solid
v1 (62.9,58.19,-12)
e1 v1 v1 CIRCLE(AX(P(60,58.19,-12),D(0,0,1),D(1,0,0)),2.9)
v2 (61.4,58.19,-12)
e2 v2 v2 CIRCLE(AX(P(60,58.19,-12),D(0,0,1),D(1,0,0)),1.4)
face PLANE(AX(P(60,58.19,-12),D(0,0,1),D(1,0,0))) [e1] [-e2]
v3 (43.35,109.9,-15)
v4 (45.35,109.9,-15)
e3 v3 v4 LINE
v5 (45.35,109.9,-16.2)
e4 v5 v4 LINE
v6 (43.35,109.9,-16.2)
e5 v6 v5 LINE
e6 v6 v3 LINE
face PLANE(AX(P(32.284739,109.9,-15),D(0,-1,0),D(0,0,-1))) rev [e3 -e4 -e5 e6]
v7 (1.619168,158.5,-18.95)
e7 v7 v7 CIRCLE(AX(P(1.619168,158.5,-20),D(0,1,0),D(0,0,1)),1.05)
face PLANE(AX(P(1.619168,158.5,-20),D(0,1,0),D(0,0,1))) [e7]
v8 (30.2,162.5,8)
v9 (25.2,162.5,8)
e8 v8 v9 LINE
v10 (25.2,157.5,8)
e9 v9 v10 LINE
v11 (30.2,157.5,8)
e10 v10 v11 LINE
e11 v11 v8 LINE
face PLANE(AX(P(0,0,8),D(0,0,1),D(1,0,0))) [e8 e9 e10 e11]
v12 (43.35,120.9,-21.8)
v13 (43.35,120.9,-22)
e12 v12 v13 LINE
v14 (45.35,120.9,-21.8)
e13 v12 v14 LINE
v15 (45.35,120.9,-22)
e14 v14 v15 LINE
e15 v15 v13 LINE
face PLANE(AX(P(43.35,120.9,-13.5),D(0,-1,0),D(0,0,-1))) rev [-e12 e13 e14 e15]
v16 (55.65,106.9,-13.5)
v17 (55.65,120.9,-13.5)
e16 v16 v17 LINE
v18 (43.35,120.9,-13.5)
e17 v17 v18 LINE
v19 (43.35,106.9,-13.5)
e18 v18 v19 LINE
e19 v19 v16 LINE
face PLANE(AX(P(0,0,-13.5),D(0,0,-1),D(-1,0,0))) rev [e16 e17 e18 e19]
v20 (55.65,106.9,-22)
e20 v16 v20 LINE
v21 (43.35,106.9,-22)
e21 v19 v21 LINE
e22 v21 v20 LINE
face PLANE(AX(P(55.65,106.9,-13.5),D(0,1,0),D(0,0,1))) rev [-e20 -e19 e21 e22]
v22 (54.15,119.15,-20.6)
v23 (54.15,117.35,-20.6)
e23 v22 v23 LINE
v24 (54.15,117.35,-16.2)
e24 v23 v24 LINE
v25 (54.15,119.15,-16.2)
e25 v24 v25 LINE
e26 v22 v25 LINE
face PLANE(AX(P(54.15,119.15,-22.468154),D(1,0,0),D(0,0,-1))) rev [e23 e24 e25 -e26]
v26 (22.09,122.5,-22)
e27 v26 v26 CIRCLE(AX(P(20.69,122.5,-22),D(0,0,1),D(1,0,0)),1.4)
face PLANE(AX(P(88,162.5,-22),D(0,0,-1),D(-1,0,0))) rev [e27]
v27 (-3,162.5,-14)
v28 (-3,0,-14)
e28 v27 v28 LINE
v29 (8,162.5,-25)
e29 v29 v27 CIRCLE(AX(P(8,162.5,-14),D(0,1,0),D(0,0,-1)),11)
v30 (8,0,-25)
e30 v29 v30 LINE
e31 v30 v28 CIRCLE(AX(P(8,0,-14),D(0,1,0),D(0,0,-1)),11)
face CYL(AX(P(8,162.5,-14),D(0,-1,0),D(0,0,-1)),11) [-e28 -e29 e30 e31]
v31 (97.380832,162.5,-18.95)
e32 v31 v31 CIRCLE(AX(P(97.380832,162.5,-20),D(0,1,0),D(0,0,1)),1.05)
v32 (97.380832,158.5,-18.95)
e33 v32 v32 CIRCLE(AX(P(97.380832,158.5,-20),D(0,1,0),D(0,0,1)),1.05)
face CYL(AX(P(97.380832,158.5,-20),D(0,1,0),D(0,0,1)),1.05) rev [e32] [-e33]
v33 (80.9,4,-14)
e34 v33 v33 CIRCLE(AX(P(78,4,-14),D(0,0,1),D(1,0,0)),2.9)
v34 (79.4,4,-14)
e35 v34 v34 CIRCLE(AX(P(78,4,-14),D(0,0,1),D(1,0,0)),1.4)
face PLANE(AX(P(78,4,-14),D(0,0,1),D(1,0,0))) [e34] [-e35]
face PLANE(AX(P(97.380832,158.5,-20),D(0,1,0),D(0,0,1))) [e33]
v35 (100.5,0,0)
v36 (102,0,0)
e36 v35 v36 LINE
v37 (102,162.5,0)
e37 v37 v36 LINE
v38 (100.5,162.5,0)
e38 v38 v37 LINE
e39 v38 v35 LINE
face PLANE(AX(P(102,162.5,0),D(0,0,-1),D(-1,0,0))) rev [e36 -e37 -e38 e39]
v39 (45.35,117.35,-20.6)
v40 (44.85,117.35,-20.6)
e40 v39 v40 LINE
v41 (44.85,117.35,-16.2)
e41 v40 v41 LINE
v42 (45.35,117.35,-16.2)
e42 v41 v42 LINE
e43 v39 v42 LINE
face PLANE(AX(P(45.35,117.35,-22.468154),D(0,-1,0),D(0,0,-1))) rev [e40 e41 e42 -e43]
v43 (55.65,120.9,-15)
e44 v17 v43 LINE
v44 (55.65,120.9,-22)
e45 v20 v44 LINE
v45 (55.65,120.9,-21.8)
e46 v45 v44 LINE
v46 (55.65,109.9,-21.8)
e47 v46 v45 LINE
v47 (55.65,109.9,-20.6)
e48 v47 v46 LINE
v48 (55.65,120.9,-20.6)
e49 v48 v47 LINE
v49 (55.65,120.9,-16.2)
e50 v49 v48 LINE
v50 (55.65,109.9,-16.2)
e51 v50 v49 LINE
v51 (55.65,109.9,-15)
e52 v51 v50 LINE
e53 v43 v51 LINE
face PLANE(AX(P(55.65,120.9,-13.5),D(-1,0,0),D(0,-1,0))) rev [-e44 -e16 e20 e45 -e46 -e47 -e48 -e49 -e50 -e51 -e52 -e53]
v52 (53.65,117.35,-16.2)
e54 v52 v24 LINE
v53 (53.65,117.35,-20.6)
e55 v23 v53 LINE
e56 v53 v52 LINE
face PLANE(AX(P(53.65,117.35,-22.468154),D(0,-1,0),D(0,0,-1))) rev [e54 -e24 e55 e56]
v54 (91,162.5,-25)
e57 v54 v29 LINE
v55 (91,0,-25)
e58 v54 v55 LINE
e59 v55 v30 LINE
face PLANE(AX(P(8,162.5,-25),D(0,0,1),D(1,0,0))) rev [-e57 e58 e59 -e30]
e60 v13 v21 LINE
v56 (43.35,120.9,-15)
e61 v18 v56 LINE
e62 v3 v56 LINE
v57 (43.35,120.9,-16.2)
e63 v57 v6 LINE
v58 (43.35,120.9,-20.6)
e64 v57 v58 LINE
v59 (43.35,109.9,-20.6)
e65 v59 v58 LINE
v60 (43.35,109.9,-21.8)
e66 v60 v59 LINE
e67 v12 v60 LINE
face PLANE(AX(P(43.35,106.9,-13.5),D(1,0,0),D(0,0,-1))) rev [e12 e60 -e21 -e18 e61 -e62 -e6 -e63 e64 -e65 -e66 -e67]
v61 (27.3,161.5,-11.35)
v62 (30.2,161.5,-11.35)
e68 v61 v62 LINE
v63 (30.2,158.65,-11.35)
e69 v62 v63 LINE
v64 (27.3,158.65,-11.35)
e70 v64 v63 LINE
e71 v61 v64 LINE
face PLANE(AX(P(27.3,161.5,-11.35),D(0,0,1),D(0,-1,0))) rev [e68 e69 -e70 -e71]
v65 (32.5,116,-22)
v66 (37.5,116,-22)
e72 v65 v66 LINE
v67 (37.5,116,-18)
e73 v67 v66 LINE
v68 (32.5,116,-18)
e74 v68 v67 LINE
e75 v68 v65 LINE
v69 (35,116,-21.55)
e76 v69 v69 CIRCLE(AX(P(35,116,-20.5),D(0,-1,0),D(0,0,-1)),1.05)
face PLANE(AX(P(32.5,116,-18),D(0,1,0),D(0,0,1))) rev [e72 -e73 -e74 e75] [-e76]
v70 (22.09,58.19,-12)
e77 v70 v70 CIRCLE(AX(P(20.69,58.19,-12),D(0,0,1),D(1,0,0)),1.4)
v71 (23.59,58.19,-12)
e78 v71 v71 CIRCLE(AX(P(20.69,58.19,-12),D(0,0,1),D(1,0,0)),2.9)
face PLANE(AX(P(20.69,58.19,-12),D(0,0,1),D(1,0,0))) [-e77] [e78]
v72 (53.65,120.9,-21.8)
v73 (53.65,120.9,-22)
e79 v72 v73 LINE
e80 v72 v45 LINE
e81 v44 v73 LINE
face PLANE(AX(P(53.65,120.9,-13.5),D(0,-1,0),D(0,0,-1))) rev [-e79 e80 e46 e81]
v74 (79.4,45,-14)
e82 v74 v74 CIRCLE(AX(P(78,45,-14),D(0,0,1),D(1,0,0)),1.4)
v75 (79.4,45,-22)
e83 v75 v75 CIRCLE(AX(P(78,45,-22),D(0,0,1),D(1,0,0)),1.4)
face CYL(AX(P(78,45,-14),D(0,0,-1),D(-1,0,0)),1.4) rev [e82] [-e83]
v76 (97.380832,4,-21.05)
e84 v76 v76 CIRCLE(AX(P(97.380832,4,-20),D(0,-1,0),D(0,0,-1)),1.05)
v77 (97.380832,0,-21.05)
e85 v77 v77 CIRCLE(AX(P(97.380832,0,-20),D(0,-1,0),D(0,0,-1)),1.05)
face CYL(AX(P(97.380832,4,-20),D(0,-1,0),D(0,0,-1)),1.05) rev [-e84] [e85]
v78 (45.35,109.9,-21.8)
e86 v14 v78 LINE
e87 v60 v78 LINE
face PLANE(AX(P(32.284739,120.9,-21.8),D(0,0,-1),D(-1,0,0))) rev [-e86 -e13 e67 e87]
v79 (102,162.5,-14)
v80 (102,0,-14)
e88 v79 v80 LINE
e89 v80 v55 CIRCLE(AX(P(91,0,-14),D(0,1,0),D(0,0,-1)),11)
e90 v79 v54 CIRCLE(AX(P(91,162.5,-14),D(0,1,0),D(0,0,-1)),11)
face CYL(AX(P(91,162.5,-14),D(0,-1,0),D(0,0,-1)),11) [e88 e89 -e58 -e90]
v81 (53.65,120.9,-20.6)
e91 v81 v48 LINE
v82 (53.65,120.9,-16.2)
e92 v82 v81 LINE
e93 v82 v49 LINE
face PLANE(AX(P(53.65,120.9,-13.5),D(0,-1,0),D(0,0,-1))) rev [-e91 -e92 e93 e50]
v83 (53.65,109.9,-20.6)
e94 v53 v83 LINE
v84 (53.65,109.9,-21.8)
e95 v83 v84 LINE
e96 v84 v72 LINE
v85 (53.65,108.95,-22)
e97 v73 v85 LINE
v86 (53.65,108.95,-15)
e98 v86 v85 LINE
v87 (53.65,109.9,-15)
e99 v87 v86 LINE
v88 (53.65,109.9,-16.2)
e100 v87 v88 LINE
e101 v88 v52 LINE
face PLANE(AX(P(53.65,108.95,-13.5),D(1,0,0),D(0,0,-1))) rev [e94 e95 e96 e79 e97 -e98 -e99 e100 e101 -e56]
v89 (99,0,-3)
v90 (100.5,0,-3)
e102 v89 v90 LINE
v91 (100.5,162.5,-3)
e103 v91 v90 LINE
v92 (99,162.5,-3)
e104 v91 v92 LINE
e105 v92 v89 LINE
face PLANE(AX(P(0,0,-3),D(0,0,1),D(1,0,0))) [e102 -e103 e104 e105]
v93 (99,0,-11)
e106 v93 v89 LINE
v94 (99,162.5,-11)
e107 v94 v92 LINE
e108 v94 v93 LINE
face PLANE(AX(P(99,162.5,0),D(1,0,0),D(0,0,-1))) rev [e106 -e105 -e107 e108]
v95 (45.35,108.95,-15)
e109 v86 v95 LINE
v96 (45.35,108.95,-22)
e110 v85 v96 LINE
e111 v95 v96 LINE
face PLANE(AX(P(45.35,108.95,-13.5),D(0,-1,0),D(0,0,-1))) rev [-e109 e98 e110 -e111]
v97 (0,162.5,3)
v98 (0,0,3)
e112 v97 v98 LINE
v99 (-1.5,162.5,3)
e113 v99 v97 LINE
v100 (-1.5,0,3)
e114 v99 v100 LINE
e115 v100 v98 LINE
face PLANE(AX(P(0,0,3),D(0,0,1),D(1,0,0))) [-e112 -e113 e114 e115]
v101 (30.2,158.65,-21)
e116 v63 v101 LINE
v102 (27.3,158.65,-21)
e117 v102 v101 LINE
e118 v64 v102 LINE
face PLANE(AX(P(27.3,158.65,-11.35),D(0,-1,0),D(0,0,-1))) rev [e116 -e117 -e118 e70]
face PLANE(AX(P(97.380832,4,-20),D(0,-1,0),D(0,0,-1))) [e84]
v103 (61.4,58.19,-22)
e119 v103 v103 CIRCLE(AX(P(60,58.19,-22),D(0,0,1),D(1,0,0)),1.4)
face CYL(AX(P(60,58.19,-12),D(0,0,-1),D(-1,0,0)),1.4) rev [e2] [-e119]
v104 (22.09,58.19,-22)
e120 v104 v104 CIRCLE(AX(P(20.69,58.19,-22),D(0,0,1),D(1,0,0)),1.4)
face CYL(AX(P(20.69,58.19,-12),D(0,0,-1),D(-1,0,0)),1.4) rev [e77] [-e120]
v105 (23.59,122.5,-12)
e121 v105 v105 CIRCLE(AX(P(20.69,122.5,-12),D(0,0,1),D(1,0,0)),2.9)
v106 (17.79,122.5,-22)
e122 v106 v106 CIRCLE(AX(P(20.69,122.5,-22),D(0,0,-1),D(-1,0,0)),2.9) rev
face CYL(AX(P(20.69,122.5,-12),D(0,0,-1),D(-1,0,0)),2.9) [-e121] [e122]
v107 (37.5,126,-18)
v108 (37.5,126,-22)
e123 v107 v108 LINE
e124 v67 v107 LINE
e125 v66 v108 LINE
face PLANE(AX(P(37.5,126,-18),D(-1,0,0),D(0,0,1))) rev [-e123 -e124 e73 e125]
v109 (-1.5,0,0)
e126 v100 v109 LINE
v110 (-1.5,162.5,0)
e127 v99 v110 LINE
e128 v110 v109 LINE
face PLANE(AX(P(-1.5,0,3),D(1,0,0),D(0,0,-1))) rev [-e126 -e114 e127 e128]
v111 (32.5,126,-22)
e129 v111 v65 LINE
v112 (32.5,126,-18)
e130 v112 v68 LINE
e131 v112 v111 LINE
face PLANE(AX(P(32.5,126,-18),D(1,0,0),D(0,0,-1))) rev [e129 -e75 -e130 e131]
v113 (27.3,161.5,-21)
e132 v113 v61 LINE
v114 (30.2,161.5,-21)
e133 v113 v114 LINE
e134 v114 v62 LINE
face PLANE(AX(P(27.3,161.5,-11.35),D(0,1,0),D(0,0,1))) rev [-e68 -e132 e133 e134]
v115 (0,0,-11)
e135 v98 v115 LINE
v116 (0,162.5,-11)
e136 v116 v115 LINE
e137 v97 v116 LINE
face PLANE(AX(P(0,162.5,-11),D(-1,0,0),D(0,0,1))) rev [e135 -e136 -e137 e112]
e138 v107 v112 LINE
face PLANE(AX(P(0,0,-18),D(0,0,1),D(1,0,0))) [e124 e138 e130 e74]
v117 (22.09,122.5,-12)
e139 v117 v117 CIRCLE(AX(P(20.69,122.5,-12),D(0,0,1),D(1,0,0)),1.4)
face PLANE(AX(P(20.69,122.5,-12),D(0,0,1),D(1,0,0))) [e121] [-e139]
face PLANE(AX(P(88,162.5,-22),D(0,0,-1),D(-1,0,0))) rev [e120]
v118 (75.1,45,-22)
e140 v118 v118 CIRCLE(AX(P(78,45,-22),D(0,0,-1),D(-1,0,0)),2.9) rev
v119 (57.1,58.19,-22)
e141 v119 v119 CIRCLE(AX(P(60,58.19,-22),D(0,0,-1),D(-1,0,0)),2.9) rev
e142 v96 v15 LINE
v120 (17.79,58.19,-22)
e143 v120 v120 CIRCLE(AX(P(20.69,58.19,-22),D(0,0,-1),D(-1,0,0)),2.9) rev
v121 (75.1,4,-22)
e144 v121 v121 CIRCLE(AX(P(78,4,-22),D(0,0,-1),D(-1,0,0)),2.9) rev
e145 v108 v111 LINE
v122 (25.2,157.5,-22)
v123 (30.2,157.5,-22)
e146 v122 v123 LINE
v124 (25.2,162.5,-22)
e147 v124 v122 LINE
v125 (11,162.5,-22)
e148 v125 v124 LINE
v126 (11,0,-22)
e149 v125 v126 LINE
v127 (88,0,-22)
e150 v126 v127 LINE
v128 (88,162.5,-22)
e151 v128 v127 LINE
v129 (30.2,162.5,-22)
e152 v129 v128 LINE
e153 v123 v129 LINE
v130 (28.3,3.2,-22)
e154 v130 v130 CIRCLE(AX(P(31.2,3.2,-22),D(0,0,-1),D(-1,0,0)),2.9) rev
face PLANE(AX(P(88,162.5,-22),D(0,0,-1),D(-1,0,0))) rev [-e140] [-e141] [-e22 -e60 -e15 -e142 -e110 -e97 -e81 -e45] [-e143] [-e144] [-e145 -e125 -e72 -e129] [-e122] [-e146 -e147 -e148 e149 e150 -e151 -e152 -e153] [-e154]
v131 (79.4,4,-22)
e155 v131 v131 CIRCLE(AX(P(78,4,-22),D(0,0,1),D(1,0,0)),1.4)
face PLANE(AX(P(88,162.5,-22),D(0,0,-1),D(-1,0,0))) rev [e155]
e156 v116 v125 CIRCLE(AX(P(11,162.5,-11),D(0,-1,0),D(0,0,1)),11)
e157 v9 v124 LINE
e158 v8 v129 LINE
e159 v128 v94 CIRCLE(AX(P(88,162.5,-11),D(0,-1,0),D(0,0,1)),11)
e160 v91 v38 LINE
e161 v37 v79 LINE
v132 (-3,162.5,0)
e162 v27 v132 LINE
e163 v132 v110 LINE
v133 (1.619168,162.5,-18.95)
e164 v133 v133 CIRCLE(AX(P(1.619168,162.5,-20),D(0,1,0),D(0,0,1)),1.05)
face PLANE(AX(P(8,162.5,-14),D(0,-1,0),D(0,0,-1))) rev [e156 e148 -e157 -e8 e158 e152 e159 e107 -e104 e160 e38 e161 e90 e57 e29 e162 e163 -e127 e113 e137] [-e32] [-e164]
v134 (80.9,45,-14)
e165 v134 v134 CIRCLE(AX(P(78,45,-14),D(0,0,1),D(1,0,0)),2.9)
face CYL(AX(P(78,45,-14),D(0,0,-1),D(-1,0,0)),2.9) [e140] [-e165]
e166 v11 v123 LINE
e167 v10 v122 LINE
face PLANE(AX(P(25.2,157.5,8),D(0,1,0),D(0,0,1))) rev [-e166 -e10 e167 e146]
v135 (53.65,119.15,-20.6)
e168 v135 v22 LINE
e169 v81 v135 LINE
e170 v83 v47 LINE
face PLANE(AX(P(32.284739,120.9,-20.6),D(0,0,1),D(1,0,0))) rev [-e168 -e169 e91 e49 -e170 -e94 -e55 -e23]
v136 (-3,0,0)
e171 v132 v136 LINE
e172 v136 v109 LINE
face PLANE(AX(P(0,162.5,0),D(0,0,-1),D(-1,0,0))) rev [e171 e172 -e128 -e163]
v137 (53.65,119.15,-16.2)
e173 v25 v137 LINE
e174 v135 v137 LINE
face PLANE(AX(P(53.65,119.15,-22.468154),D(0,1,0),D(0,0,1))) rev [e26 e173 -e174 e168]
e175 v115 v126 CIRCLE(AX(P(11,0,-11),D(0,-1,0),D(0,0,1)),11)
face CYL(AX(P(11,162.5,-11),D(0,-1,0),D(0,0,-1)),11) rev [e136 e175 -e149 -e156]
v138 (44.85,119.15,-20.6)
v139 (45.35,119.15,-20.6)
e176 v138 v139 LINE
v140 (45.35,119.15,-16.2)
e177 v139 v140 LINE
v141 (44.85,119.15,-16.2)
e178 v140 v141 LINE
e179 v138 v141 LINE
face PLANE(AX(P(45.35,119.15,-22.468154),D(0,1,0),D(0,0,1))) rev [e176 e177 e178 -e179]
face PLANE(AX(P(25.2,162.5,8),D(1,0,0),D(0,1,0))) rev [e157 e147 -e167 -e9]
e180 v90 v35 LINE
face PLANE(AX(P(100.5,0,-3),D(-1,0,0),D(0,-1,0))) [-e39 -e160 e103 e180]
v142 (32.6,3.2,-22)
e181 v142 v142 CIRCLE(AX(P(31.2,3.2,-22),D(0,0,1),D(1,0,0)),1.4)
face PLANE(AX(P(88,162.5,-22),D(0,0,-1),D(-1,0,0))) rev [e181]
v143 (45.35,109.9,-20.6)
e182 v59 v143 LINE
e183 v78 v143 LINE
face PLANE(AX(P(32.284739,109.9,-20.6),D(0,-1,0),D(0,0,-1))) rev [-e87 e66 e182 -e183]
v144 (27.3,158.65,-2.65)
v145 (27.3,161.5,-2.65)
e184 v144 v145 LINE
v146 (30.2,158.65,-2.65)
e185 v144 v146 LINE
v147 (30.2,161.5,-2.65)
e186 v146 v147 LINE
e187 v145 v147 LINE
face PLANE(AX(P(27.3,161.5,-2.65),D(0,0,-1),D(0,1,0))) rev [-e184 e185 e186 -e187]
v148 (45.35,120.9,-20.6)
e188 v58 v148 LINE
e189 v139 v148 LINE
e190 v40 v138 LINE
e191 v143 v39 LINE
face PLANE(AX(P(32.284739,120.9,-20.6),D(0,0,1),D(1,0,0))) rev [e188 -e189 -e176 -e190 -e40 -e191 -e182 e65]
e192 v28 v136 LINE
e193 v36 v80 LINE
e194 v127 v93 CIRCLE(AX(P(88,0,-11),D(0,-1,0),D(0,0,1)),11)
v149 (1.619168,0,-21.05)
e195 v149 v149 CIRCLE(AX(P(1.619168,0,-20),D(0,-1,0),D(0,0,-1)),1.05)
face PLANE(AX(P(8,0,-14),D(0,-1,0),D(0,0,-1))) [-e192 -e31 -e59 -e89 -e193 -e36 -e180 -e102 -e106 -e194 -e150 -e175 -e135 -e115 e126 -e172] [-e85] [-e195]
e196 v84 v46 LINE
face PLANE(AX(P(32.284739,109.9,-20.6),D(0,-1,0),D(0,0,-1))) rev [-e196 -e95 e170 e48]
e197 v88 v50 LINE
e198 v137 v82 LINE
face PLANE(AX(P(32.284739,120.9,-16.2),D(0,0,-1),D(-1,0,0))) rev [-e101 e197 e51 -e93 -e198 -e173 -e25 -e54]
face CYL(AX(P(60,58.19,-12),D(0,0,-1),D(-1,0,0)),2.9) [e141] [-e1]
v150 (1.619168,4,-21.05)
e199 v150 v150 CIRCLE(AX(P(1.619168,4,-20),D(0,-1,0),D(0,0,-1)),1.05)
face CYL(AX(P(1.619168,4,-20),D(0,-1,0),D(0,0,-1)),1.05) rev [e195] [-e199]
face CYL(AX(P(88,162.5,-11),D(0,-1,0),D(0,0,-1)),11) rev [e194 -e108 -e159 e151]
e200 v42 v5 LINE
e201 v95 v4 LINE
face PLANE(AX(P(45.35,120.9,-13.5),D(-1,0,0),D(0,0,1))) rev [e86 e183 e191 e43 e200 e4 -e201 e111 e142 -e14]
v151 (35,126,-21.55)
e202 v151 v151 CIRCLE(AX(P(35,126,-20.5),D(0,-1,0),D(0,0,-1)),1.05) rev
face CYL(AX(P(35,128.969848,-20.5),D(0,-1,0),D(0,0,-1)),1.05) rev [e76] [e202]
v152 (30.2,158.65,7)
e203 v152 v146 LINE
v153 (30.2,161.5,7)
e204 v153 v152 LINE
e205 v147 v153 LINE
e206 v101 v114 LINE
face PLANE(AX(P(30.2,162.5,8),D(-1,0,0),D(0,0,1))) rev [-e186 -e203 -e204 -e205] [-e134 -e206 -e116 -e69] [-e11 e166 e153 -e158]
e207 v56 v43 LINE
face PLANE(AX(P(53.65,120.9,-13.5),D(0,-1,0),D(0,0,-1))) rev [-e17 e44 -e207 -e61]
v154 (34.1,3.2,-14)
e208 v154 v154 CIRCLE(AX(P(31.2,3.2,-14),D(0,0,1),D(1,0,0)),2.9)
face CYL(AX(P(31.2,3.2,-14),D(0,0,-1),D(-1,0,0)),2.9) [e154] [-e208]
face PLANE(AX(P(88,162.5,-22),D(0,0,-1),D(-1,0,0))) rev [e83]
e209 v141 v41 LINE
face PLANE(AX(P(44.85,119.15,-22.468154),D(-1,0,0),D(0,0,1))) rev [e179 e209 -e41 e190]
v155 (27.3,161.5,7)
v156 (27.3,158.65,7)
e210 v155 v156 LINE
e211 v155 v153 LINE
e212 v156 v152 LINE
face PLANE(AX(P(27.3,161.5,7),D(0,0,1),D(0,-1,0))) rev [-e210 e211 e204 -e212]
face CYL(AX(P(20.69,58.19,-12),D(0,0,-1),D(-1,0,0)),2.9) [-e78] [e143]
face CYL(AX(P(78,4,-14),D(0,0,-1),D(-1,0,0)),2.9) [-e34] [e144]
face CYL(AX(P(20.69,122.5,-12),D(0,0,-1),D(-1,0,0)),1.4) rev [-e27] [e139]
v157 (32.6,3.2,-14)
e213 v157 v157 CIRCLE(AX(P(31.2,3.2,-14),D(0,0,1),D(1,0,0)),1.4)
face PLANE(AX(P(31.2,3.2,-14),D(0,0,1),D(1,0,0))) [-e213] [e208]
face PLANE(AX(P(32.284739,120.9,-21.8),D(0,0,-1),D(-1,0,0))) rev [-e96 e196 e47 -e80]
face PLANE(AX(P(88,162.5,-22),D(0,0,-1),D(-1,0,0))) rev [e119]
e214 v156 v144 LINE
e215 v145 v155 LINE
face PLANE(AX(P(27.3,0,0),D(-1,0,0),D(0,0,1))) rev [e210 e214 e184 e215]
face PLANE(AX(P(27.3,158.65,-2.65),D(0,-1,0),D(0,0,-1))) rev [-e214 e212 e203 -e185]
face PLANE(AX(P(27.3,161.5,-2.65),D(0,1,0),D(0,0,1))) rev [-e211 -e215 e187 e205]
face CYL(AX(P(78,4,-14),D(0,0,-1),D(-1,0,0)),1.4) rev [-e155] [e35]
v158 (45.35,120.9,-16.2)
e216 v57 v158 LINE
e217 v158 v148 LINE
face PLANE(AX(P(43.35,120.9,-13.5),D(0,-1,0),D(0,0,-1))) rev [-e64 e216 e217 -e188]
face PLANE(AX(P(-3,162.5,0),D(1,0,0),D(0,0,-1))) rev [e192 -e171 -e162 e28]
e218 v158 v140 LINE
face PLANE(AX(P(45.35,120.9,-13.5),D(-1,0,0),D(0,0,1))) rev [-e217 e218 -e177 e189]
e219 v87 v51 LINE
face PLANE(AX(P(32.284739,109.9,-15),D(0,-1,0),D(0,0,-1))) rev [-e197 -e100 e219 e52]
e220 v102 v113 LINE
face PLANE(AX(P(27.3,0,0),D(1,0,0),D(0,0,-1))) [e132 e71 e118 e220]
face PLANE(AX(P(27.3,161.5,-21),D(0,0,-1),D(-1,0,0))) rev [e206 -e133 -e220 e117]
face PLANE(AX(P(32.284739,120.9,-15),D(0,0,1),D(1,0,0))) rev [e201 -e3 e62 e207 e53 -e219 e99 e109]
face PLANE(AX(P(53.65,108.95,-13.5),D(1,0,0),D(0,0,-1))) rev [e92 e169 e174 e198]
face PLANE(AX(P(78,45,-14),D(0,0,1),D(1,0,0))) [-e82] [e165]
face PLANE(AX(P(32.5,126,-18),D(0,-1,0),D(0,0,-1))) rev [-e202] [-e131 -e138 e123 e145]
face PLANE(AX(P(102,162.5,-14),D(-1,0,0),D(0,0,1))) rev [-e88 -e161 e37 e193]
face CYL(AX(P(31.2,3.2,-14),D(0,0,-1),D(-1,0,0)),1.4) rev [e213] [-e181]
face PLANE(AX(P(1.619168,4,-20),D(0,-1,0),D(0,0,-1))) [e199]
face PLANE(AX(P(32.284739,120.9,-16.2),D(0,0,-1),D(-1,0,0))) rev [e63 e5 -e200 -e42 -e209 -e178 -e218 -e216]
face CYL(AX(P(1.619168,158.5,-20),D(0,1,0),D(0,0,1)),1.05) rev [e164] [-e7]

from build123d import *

# Parameters (mm, degrees)
EXTRUDE_1_DEPTH       = 162.5
SKETCH_2_W            = 1.5
SKETCH_2_H            = 162.5
EXTRUDE_2_DEPTH       = 3
SKETCH_2_4_W          = 1.5
SKETCH_2_4_H          = 162.5
CUT_EXTRUDE_2_DEPTH   = 3
SKETCH_3_R            = 1.05
CUT_EXTRUDE_3_DEPTH   = 4
CUT_EXTRUDE_START     = -4
SKETCH_4_R            = 1.05
CUT_EXTRUDE_4_DEPTH   = 4
SKETCH_6_R            = 2.9
SKETCH_6_R_2          = 1.4
EXTRUDE_1_2_DEPTH     = 10
SKETCH_7_R            = 2.9
SKETCH_7_R_2          = 1.4
EXTRUDE_2_2_DEPTH     = 8
EXTRUDE_4_DEPTH       = 8.5
CUT_EXTRUDE_6_REACH   = 176.56
SKETCH_13_W           = 1.2
SKETCH_13_H           = 11
EXTRUDE_START         = 1.4
EXTRUDE_5_OUTLINE_W   = 0.5
EXTRUDE_5_OUTLINE_H   = 1.8
EXTRUDE_5_DEPTH       = 4.4
EXTRUDE_5_2_OUTLINE_W = 5
EXTRUDE_5_2_OUTLINE_H = 10
EXTRUDE_5_2_DEPTH     = 4
EXTRUDE_START_2       = 116
EXTRUDE_6_OUTLINE_R   = 1.05
EXTRUDE_6_DEPTH       = 10
EXTRUDE_START_3       = 157.5
EXTRUDE_6_2_OUTLINE_W = 5
EXTRUDE_6_2_OUTLINE_H = 30
EXTRUDE_6_2_DEPTH     = 5
EXTRUDE_START_4       = -7.5
EXTRUDE_7_OUTLINE_W   = 2.9
EXTRUDE_7_OUTLINE_H   = 2.85
EXTRUDE_7_DEPTH       = 9.65
EXTRUDE_START_5       = 10.85
EXTRUDE_7_2_OUTLINE_W = 2.9
EXTRUDE_7_2_OUTLINE_H = 2.85
EXTRUDE_7_2_DEPTH     = 9.65
EXTRUDE_START_6       = -1.5
EXTRUDE_7_3_OUTLINE_W = 8.3
EXTRUDE_7_3_OUTLINE_H = 11.95
EXTRUDE_7_3_DEPTH     = 1.5


# Read off the part's stored shape, not the designer's step: 凸台-拉伸5, 凸台-拉伸6, 凸台-拉伸7
with BuildPart() as part:
    # 草图1 → Extrude 1 (new body)
    with BuildSketch(Plane(origin=(0, 0, 0), x_dir=(1, 0, 0), z_dir=(0, 1, 0))):
        with BuildLine():
            Line((-3, 0), (-3, 14))
            ThreePointArc((-3, 14), (0.221825407, 21.778174593), (8, 25))
            Line((8, 25), (91, 25))
            ThreePointArc((91, 25), (98.778174593, 21.778174593), (102, 14))
            Line((102, 14), (102, 0))
            Line((102, 0), (99, 0))
            Line((99, 0), (99, 11))
            ThreePointArc((99, 11), (95.778174593, 18.778174593), (88, 22))
            Line((88, 22), (11, 22))
            ThreePointArc((11, 22), (3.221825407, 18.778174593), (0, 11))
            Line((0, 11), (0, 0))
            Line((0, 0), (-3, 0))
        make_face()
    extrude(amount=EXTRUDE_1_DEPTH)

    # 草图2 → Extrude 2 (add)
    with BuildSketch(Plane.XY):
        with Locations((-0.75, 81.25)):
            Rectangle(SKETCH_2_W, SKETCH_2_H)
    extrude(amount=EXTRUDE_2_DEPTH)

    # 草图2<4> → 切除-拉伸2 (cut)
    with BuildSketch(Plane.XY):
        with Locations((99.75, 81.25)):
            Rectangle(SKETCH_2_4_W, SKETCH_2_4_H)
    extrude(amount=-CUT_EXTRUDE_2_DEPTH, mode=Mode.SUBTRACT)

    # 草图3 → 切除-拉伸3 (cut)
    with BuildSketch(Plane(origin=(0, 162.5, 0), x_dir=(1, 0, 0), z_dir=(0, 1, 0))):
        with Locations(Location((1.61916848, 20, 0), (0, 0, 270))):
            Circle(SKETCH_3_R)
        with Locations(Location((97.38083152, 20, 0), (0, 0, 270))):
            Circle(SKETCH_3_R)
    extrude(amount=-CUT_EXTRUDE_3_DEPTH, mode=Mode.SUBTRACT)

    # 草图4 → 切除-拉伸4 (cut)
    with BuildSketch(Plane.XZ.offset(CUT_EXTRUDE_START)):
        with Locations(Location((1.61916848, -20, 0), (0, 0, 90))):
            Circle(SKETCH_4_R)
        with Locations(Location((97.38083152, -20, 0), (0, 0, 90))):
            Circle(SKETCH_4_R)
    extrude(amount=CUT_EXTRUDE_4_DEPTH, mode=Mode.SUBTRACT)

    # 草图6 → Extrude 1 2 (add)
    # profile 1 of 3: a face of its own
    with BuildSketch(Plane.XY.offset(-22)):
        with Locations((20.69, 122.5)):
            Circle(SKETCH_6_R)
        with Locations((20.69, 122.5)):
            Circle(SKETCH_6_R_2, mode=Mode.SUBTRACT)
    # profile 2 of 3: a face of its own
    with BuildSketch(Plane.XY.offset(-22)):
        with Locations((20.69, 58.19)):
            Circle(SKETCH_6_R)
        with Locations((20.69, 58.19)):
            Circle(SKETCH_6_R_2, mode=Mode.SUBTRACT)
    # profile 3 of 3: a face of its own
    with BuildSketch(Plane.XY.offset(-22)):
        with Locations((60, 58.19)):
            Circle(SKETCH_6_R)
        with Locations((60, 58.19)):
            Circle(SKETCH_6_R_2, mode=Mode.SUBTRACT)
    extrude(amount=EXTRUDE_1_2_DEPTH)

    # 草图7 → Extrude 2 2 (add)
    # profile 1 of 3: a face of its own
    with BuildSketch(Plane.XY.offset(-22)):
        with Locations((78, 4)):
            Circle(SKETCH_7_R)
        with Locations((78, 4)):
            Circle(SKETCH_7_R_2, mode=Mode.SUBTRACT)
    # profile 2 of 3: a face of its own
    with BuildSketch(Plane.XY.offset(-22)):
        with Locations((31.2, 3.2)):
            Circle(SKETCH_7_R)
        with Locations((31.2, 3.2)):
            Circle(SKETCH_7_R_2, mode=Mode.SUBTRACT)
    # profile 3 of 3: a face of its own
    with BuildSketch(Plane.XY.offset(-22)):
        with Locations((78, 45)):
            Circle(SKETCH_7_R)
        with Locations((78, 45)):
            Circle(SKETCH_7_R_2, mode=Mode.SUBTRACT)
    extrude(amount=EXTRUDE_2_2_DEPTH)

    # 草图12 → 凸台-拉伸4 (add)
    with BuildSketch(Plane.XY.offset(-22)):
        Polygon((45.35, 120.9), (45.35, 108.95), (53.65, 108.95), (53.65, 120.9), (55.65, 120.9), (55.65, 106.9), (43.35, 106.9), (43.35, 120.9), align=None)
    extrude(amount=EXTRUDE_4_DEPTH)

    # 切除-拉伸6: up to this face of the body (flat: up to its plane)
    cut_extrude_6_end = Plane(part.part.faces().sort_by_distance((43.35, 113.9, -17.75))[0])
    # 草图13 → 切除-拉伸6 (cut, up to the picked face)
    with BuildSketch(Plane(origin=(55.65, 0, 0), x_dir=(0, 0, -1), z_dir=(1, 0, 0)), mode=Mode.PRIVATE) as cut_extrude_6_sk1:
        with Locations((15.6, 115.4)):
            Rectangle(SKETCH_13_W, SKETCH_13_H)
    cut_extrude_6_tool1 = split(extrude(cut_extrude_6_sk1.sketch, amount=-CUT_EXTRUDE_6_REACH, mode=Mode.PRIVATE), bisect_by=cut_extrude_6_end, keep=Keep.BOTH, mode=Mode.PRIVATE)
    # 草图13 → 切除-拉伸6 (cut, up to the picked face)
    with BuildSketch(Plane(origin=(55.65, 0, 0), x_dir=(0, 0, -1), z_dir=(1, 0, 0)), mode=Mode.PRIVATE) as cut_extrude_6_sk2:
        with Locations((21.2, 115.4)):
            Rectangle(SKETCH_13_W, SKETCH_13_H)
    cut_extrude_6_tool2 = split(extrude(cut_extrude_6_sk2.sketch, amount=-CUT_EXTRUDE_6_REACH, mode=Mode.PRIVATE), bisect_by=cut_extrude_6_end, keep=Keep.BOTH, mode=Mode.PRIVATE)
    add(cut_extrude_6_tool1.solids().sort_by(Axis((55.65, 115.4, -15.6), (-1, 0, 0)))[0], mode=Mode.SUBTRACT)
    add(cut_extrude_6_tool2.solids().sort_by(Axis((55.65, 115.4, -21.2), (-1, 0, 0)))[0], mode=Mode.SUBTRACT)

    # 凸台-拉伸5 outline → 凸台-拉伸5 (cut)
    with BuildSketch(Plane.XY.offset(-22).offset(EXTRUDE_START)):
        with Locations((53.9, 118.25)):
            Rectangle(EXTRUDE_5_OUTLINE_W, EXTRUDE_5_OUTLINE_H)
        with Locations((45.1, 118.25)):
            Rectangle(EXTRUDE_5_OUTLINE_W, EXTRUDE_5_OUTLINE_H)
    extrude(amount=EXTRUDE_5_DEPTH, mode=Mode.SUBTRACT)

    # Extrude 5 2 outline → Extrude 5 2 (add)
    with BuildSketch(Plane.XY.offset(-22)):
        with Locations((35, 121)):
            Rectangle(EXTRUDE_5_2_OUTLINE_W, EXTRUDE_5_2_OUTLINE_H)
    extrude(amount=EXTRUDE_5_2_DEPTH)

    # 凸台-拉伸6 outline → 凸台-拉伸6 (cut)
    with BuildSketch(Plane(origin=(0, 0, 0), x_dir=(1, 0, 0), z_dir=(0, 1, 0)).offset(EXTRUDE_START_2)):
        with Locations((35, 20.5)):
            Circle(EXTRUDE_6_OUTLINE_R)
    extrude(amount=EXTRUDE_6_DEPTH, mode=Mode.SUBTRACT)

    # Extrude 6 2 outline → Extrude 6 2 (add)
    with BuildSketch(Plane(origin=(0, 0, 0), x_dir=(1, 0, 0), z_dir=(0, 1, 0)).offset(EXTRUDE_START_3)):
        with Locations((27.7, 7)):
            Rectangle(EXTRUDE_6_2_OUTLINE_W, EXTRUDE_6_2_OUTLINE_H)
    extrude(amount=EXTRUDE_6_2_DEPTH)

    # 凸台-拉伸7 outline → 凸台-拉伸7 (cut)
    with BuildSketch(Plane.XY.offset(-13.5).offset(EXTRUDE_START_4)):
        with Locations((28.75, 160.075)):
            Rectangle(EXTRUDE_7_OUTLINE_W, EXTRUDE_7_OUTLINE_H)
    extrude(amount=EXTRUDE_7_DEPTH, mode=Mode.SUBTRACT)

    # Extrude 7 2 outline → Extrude 7 2 (cut)
    with BuildSketch(Plane.XY.offset(-13.5).offset(EXTRUDE_START_5)):
        with Locations((28.75, 160.075)):
            Rectangle(EXTRUDE_7_2_OUTLINE_W, EXTRUDE_7_2_OUTLINE_H)
    extrude(amount=EXTRUDE_7_2_DEPTH, mode=Mode.SUBTRACT)

    # Extrude 7 3 outline → Extrude 7 3 (add)
    with BuildSketch(Plane.XY.offset(-13.5).offset(EXTRUDE_START_6)):
        with Locations((49.5, 114.925)):
            Rectangle(EXTRUDE_7_3_OUTLINE_W, EXTRUDE_7_3_OUTLINE_H)
    extrude(amount=EXTRUDE_7_3_DEPTH)


solid = part.part
